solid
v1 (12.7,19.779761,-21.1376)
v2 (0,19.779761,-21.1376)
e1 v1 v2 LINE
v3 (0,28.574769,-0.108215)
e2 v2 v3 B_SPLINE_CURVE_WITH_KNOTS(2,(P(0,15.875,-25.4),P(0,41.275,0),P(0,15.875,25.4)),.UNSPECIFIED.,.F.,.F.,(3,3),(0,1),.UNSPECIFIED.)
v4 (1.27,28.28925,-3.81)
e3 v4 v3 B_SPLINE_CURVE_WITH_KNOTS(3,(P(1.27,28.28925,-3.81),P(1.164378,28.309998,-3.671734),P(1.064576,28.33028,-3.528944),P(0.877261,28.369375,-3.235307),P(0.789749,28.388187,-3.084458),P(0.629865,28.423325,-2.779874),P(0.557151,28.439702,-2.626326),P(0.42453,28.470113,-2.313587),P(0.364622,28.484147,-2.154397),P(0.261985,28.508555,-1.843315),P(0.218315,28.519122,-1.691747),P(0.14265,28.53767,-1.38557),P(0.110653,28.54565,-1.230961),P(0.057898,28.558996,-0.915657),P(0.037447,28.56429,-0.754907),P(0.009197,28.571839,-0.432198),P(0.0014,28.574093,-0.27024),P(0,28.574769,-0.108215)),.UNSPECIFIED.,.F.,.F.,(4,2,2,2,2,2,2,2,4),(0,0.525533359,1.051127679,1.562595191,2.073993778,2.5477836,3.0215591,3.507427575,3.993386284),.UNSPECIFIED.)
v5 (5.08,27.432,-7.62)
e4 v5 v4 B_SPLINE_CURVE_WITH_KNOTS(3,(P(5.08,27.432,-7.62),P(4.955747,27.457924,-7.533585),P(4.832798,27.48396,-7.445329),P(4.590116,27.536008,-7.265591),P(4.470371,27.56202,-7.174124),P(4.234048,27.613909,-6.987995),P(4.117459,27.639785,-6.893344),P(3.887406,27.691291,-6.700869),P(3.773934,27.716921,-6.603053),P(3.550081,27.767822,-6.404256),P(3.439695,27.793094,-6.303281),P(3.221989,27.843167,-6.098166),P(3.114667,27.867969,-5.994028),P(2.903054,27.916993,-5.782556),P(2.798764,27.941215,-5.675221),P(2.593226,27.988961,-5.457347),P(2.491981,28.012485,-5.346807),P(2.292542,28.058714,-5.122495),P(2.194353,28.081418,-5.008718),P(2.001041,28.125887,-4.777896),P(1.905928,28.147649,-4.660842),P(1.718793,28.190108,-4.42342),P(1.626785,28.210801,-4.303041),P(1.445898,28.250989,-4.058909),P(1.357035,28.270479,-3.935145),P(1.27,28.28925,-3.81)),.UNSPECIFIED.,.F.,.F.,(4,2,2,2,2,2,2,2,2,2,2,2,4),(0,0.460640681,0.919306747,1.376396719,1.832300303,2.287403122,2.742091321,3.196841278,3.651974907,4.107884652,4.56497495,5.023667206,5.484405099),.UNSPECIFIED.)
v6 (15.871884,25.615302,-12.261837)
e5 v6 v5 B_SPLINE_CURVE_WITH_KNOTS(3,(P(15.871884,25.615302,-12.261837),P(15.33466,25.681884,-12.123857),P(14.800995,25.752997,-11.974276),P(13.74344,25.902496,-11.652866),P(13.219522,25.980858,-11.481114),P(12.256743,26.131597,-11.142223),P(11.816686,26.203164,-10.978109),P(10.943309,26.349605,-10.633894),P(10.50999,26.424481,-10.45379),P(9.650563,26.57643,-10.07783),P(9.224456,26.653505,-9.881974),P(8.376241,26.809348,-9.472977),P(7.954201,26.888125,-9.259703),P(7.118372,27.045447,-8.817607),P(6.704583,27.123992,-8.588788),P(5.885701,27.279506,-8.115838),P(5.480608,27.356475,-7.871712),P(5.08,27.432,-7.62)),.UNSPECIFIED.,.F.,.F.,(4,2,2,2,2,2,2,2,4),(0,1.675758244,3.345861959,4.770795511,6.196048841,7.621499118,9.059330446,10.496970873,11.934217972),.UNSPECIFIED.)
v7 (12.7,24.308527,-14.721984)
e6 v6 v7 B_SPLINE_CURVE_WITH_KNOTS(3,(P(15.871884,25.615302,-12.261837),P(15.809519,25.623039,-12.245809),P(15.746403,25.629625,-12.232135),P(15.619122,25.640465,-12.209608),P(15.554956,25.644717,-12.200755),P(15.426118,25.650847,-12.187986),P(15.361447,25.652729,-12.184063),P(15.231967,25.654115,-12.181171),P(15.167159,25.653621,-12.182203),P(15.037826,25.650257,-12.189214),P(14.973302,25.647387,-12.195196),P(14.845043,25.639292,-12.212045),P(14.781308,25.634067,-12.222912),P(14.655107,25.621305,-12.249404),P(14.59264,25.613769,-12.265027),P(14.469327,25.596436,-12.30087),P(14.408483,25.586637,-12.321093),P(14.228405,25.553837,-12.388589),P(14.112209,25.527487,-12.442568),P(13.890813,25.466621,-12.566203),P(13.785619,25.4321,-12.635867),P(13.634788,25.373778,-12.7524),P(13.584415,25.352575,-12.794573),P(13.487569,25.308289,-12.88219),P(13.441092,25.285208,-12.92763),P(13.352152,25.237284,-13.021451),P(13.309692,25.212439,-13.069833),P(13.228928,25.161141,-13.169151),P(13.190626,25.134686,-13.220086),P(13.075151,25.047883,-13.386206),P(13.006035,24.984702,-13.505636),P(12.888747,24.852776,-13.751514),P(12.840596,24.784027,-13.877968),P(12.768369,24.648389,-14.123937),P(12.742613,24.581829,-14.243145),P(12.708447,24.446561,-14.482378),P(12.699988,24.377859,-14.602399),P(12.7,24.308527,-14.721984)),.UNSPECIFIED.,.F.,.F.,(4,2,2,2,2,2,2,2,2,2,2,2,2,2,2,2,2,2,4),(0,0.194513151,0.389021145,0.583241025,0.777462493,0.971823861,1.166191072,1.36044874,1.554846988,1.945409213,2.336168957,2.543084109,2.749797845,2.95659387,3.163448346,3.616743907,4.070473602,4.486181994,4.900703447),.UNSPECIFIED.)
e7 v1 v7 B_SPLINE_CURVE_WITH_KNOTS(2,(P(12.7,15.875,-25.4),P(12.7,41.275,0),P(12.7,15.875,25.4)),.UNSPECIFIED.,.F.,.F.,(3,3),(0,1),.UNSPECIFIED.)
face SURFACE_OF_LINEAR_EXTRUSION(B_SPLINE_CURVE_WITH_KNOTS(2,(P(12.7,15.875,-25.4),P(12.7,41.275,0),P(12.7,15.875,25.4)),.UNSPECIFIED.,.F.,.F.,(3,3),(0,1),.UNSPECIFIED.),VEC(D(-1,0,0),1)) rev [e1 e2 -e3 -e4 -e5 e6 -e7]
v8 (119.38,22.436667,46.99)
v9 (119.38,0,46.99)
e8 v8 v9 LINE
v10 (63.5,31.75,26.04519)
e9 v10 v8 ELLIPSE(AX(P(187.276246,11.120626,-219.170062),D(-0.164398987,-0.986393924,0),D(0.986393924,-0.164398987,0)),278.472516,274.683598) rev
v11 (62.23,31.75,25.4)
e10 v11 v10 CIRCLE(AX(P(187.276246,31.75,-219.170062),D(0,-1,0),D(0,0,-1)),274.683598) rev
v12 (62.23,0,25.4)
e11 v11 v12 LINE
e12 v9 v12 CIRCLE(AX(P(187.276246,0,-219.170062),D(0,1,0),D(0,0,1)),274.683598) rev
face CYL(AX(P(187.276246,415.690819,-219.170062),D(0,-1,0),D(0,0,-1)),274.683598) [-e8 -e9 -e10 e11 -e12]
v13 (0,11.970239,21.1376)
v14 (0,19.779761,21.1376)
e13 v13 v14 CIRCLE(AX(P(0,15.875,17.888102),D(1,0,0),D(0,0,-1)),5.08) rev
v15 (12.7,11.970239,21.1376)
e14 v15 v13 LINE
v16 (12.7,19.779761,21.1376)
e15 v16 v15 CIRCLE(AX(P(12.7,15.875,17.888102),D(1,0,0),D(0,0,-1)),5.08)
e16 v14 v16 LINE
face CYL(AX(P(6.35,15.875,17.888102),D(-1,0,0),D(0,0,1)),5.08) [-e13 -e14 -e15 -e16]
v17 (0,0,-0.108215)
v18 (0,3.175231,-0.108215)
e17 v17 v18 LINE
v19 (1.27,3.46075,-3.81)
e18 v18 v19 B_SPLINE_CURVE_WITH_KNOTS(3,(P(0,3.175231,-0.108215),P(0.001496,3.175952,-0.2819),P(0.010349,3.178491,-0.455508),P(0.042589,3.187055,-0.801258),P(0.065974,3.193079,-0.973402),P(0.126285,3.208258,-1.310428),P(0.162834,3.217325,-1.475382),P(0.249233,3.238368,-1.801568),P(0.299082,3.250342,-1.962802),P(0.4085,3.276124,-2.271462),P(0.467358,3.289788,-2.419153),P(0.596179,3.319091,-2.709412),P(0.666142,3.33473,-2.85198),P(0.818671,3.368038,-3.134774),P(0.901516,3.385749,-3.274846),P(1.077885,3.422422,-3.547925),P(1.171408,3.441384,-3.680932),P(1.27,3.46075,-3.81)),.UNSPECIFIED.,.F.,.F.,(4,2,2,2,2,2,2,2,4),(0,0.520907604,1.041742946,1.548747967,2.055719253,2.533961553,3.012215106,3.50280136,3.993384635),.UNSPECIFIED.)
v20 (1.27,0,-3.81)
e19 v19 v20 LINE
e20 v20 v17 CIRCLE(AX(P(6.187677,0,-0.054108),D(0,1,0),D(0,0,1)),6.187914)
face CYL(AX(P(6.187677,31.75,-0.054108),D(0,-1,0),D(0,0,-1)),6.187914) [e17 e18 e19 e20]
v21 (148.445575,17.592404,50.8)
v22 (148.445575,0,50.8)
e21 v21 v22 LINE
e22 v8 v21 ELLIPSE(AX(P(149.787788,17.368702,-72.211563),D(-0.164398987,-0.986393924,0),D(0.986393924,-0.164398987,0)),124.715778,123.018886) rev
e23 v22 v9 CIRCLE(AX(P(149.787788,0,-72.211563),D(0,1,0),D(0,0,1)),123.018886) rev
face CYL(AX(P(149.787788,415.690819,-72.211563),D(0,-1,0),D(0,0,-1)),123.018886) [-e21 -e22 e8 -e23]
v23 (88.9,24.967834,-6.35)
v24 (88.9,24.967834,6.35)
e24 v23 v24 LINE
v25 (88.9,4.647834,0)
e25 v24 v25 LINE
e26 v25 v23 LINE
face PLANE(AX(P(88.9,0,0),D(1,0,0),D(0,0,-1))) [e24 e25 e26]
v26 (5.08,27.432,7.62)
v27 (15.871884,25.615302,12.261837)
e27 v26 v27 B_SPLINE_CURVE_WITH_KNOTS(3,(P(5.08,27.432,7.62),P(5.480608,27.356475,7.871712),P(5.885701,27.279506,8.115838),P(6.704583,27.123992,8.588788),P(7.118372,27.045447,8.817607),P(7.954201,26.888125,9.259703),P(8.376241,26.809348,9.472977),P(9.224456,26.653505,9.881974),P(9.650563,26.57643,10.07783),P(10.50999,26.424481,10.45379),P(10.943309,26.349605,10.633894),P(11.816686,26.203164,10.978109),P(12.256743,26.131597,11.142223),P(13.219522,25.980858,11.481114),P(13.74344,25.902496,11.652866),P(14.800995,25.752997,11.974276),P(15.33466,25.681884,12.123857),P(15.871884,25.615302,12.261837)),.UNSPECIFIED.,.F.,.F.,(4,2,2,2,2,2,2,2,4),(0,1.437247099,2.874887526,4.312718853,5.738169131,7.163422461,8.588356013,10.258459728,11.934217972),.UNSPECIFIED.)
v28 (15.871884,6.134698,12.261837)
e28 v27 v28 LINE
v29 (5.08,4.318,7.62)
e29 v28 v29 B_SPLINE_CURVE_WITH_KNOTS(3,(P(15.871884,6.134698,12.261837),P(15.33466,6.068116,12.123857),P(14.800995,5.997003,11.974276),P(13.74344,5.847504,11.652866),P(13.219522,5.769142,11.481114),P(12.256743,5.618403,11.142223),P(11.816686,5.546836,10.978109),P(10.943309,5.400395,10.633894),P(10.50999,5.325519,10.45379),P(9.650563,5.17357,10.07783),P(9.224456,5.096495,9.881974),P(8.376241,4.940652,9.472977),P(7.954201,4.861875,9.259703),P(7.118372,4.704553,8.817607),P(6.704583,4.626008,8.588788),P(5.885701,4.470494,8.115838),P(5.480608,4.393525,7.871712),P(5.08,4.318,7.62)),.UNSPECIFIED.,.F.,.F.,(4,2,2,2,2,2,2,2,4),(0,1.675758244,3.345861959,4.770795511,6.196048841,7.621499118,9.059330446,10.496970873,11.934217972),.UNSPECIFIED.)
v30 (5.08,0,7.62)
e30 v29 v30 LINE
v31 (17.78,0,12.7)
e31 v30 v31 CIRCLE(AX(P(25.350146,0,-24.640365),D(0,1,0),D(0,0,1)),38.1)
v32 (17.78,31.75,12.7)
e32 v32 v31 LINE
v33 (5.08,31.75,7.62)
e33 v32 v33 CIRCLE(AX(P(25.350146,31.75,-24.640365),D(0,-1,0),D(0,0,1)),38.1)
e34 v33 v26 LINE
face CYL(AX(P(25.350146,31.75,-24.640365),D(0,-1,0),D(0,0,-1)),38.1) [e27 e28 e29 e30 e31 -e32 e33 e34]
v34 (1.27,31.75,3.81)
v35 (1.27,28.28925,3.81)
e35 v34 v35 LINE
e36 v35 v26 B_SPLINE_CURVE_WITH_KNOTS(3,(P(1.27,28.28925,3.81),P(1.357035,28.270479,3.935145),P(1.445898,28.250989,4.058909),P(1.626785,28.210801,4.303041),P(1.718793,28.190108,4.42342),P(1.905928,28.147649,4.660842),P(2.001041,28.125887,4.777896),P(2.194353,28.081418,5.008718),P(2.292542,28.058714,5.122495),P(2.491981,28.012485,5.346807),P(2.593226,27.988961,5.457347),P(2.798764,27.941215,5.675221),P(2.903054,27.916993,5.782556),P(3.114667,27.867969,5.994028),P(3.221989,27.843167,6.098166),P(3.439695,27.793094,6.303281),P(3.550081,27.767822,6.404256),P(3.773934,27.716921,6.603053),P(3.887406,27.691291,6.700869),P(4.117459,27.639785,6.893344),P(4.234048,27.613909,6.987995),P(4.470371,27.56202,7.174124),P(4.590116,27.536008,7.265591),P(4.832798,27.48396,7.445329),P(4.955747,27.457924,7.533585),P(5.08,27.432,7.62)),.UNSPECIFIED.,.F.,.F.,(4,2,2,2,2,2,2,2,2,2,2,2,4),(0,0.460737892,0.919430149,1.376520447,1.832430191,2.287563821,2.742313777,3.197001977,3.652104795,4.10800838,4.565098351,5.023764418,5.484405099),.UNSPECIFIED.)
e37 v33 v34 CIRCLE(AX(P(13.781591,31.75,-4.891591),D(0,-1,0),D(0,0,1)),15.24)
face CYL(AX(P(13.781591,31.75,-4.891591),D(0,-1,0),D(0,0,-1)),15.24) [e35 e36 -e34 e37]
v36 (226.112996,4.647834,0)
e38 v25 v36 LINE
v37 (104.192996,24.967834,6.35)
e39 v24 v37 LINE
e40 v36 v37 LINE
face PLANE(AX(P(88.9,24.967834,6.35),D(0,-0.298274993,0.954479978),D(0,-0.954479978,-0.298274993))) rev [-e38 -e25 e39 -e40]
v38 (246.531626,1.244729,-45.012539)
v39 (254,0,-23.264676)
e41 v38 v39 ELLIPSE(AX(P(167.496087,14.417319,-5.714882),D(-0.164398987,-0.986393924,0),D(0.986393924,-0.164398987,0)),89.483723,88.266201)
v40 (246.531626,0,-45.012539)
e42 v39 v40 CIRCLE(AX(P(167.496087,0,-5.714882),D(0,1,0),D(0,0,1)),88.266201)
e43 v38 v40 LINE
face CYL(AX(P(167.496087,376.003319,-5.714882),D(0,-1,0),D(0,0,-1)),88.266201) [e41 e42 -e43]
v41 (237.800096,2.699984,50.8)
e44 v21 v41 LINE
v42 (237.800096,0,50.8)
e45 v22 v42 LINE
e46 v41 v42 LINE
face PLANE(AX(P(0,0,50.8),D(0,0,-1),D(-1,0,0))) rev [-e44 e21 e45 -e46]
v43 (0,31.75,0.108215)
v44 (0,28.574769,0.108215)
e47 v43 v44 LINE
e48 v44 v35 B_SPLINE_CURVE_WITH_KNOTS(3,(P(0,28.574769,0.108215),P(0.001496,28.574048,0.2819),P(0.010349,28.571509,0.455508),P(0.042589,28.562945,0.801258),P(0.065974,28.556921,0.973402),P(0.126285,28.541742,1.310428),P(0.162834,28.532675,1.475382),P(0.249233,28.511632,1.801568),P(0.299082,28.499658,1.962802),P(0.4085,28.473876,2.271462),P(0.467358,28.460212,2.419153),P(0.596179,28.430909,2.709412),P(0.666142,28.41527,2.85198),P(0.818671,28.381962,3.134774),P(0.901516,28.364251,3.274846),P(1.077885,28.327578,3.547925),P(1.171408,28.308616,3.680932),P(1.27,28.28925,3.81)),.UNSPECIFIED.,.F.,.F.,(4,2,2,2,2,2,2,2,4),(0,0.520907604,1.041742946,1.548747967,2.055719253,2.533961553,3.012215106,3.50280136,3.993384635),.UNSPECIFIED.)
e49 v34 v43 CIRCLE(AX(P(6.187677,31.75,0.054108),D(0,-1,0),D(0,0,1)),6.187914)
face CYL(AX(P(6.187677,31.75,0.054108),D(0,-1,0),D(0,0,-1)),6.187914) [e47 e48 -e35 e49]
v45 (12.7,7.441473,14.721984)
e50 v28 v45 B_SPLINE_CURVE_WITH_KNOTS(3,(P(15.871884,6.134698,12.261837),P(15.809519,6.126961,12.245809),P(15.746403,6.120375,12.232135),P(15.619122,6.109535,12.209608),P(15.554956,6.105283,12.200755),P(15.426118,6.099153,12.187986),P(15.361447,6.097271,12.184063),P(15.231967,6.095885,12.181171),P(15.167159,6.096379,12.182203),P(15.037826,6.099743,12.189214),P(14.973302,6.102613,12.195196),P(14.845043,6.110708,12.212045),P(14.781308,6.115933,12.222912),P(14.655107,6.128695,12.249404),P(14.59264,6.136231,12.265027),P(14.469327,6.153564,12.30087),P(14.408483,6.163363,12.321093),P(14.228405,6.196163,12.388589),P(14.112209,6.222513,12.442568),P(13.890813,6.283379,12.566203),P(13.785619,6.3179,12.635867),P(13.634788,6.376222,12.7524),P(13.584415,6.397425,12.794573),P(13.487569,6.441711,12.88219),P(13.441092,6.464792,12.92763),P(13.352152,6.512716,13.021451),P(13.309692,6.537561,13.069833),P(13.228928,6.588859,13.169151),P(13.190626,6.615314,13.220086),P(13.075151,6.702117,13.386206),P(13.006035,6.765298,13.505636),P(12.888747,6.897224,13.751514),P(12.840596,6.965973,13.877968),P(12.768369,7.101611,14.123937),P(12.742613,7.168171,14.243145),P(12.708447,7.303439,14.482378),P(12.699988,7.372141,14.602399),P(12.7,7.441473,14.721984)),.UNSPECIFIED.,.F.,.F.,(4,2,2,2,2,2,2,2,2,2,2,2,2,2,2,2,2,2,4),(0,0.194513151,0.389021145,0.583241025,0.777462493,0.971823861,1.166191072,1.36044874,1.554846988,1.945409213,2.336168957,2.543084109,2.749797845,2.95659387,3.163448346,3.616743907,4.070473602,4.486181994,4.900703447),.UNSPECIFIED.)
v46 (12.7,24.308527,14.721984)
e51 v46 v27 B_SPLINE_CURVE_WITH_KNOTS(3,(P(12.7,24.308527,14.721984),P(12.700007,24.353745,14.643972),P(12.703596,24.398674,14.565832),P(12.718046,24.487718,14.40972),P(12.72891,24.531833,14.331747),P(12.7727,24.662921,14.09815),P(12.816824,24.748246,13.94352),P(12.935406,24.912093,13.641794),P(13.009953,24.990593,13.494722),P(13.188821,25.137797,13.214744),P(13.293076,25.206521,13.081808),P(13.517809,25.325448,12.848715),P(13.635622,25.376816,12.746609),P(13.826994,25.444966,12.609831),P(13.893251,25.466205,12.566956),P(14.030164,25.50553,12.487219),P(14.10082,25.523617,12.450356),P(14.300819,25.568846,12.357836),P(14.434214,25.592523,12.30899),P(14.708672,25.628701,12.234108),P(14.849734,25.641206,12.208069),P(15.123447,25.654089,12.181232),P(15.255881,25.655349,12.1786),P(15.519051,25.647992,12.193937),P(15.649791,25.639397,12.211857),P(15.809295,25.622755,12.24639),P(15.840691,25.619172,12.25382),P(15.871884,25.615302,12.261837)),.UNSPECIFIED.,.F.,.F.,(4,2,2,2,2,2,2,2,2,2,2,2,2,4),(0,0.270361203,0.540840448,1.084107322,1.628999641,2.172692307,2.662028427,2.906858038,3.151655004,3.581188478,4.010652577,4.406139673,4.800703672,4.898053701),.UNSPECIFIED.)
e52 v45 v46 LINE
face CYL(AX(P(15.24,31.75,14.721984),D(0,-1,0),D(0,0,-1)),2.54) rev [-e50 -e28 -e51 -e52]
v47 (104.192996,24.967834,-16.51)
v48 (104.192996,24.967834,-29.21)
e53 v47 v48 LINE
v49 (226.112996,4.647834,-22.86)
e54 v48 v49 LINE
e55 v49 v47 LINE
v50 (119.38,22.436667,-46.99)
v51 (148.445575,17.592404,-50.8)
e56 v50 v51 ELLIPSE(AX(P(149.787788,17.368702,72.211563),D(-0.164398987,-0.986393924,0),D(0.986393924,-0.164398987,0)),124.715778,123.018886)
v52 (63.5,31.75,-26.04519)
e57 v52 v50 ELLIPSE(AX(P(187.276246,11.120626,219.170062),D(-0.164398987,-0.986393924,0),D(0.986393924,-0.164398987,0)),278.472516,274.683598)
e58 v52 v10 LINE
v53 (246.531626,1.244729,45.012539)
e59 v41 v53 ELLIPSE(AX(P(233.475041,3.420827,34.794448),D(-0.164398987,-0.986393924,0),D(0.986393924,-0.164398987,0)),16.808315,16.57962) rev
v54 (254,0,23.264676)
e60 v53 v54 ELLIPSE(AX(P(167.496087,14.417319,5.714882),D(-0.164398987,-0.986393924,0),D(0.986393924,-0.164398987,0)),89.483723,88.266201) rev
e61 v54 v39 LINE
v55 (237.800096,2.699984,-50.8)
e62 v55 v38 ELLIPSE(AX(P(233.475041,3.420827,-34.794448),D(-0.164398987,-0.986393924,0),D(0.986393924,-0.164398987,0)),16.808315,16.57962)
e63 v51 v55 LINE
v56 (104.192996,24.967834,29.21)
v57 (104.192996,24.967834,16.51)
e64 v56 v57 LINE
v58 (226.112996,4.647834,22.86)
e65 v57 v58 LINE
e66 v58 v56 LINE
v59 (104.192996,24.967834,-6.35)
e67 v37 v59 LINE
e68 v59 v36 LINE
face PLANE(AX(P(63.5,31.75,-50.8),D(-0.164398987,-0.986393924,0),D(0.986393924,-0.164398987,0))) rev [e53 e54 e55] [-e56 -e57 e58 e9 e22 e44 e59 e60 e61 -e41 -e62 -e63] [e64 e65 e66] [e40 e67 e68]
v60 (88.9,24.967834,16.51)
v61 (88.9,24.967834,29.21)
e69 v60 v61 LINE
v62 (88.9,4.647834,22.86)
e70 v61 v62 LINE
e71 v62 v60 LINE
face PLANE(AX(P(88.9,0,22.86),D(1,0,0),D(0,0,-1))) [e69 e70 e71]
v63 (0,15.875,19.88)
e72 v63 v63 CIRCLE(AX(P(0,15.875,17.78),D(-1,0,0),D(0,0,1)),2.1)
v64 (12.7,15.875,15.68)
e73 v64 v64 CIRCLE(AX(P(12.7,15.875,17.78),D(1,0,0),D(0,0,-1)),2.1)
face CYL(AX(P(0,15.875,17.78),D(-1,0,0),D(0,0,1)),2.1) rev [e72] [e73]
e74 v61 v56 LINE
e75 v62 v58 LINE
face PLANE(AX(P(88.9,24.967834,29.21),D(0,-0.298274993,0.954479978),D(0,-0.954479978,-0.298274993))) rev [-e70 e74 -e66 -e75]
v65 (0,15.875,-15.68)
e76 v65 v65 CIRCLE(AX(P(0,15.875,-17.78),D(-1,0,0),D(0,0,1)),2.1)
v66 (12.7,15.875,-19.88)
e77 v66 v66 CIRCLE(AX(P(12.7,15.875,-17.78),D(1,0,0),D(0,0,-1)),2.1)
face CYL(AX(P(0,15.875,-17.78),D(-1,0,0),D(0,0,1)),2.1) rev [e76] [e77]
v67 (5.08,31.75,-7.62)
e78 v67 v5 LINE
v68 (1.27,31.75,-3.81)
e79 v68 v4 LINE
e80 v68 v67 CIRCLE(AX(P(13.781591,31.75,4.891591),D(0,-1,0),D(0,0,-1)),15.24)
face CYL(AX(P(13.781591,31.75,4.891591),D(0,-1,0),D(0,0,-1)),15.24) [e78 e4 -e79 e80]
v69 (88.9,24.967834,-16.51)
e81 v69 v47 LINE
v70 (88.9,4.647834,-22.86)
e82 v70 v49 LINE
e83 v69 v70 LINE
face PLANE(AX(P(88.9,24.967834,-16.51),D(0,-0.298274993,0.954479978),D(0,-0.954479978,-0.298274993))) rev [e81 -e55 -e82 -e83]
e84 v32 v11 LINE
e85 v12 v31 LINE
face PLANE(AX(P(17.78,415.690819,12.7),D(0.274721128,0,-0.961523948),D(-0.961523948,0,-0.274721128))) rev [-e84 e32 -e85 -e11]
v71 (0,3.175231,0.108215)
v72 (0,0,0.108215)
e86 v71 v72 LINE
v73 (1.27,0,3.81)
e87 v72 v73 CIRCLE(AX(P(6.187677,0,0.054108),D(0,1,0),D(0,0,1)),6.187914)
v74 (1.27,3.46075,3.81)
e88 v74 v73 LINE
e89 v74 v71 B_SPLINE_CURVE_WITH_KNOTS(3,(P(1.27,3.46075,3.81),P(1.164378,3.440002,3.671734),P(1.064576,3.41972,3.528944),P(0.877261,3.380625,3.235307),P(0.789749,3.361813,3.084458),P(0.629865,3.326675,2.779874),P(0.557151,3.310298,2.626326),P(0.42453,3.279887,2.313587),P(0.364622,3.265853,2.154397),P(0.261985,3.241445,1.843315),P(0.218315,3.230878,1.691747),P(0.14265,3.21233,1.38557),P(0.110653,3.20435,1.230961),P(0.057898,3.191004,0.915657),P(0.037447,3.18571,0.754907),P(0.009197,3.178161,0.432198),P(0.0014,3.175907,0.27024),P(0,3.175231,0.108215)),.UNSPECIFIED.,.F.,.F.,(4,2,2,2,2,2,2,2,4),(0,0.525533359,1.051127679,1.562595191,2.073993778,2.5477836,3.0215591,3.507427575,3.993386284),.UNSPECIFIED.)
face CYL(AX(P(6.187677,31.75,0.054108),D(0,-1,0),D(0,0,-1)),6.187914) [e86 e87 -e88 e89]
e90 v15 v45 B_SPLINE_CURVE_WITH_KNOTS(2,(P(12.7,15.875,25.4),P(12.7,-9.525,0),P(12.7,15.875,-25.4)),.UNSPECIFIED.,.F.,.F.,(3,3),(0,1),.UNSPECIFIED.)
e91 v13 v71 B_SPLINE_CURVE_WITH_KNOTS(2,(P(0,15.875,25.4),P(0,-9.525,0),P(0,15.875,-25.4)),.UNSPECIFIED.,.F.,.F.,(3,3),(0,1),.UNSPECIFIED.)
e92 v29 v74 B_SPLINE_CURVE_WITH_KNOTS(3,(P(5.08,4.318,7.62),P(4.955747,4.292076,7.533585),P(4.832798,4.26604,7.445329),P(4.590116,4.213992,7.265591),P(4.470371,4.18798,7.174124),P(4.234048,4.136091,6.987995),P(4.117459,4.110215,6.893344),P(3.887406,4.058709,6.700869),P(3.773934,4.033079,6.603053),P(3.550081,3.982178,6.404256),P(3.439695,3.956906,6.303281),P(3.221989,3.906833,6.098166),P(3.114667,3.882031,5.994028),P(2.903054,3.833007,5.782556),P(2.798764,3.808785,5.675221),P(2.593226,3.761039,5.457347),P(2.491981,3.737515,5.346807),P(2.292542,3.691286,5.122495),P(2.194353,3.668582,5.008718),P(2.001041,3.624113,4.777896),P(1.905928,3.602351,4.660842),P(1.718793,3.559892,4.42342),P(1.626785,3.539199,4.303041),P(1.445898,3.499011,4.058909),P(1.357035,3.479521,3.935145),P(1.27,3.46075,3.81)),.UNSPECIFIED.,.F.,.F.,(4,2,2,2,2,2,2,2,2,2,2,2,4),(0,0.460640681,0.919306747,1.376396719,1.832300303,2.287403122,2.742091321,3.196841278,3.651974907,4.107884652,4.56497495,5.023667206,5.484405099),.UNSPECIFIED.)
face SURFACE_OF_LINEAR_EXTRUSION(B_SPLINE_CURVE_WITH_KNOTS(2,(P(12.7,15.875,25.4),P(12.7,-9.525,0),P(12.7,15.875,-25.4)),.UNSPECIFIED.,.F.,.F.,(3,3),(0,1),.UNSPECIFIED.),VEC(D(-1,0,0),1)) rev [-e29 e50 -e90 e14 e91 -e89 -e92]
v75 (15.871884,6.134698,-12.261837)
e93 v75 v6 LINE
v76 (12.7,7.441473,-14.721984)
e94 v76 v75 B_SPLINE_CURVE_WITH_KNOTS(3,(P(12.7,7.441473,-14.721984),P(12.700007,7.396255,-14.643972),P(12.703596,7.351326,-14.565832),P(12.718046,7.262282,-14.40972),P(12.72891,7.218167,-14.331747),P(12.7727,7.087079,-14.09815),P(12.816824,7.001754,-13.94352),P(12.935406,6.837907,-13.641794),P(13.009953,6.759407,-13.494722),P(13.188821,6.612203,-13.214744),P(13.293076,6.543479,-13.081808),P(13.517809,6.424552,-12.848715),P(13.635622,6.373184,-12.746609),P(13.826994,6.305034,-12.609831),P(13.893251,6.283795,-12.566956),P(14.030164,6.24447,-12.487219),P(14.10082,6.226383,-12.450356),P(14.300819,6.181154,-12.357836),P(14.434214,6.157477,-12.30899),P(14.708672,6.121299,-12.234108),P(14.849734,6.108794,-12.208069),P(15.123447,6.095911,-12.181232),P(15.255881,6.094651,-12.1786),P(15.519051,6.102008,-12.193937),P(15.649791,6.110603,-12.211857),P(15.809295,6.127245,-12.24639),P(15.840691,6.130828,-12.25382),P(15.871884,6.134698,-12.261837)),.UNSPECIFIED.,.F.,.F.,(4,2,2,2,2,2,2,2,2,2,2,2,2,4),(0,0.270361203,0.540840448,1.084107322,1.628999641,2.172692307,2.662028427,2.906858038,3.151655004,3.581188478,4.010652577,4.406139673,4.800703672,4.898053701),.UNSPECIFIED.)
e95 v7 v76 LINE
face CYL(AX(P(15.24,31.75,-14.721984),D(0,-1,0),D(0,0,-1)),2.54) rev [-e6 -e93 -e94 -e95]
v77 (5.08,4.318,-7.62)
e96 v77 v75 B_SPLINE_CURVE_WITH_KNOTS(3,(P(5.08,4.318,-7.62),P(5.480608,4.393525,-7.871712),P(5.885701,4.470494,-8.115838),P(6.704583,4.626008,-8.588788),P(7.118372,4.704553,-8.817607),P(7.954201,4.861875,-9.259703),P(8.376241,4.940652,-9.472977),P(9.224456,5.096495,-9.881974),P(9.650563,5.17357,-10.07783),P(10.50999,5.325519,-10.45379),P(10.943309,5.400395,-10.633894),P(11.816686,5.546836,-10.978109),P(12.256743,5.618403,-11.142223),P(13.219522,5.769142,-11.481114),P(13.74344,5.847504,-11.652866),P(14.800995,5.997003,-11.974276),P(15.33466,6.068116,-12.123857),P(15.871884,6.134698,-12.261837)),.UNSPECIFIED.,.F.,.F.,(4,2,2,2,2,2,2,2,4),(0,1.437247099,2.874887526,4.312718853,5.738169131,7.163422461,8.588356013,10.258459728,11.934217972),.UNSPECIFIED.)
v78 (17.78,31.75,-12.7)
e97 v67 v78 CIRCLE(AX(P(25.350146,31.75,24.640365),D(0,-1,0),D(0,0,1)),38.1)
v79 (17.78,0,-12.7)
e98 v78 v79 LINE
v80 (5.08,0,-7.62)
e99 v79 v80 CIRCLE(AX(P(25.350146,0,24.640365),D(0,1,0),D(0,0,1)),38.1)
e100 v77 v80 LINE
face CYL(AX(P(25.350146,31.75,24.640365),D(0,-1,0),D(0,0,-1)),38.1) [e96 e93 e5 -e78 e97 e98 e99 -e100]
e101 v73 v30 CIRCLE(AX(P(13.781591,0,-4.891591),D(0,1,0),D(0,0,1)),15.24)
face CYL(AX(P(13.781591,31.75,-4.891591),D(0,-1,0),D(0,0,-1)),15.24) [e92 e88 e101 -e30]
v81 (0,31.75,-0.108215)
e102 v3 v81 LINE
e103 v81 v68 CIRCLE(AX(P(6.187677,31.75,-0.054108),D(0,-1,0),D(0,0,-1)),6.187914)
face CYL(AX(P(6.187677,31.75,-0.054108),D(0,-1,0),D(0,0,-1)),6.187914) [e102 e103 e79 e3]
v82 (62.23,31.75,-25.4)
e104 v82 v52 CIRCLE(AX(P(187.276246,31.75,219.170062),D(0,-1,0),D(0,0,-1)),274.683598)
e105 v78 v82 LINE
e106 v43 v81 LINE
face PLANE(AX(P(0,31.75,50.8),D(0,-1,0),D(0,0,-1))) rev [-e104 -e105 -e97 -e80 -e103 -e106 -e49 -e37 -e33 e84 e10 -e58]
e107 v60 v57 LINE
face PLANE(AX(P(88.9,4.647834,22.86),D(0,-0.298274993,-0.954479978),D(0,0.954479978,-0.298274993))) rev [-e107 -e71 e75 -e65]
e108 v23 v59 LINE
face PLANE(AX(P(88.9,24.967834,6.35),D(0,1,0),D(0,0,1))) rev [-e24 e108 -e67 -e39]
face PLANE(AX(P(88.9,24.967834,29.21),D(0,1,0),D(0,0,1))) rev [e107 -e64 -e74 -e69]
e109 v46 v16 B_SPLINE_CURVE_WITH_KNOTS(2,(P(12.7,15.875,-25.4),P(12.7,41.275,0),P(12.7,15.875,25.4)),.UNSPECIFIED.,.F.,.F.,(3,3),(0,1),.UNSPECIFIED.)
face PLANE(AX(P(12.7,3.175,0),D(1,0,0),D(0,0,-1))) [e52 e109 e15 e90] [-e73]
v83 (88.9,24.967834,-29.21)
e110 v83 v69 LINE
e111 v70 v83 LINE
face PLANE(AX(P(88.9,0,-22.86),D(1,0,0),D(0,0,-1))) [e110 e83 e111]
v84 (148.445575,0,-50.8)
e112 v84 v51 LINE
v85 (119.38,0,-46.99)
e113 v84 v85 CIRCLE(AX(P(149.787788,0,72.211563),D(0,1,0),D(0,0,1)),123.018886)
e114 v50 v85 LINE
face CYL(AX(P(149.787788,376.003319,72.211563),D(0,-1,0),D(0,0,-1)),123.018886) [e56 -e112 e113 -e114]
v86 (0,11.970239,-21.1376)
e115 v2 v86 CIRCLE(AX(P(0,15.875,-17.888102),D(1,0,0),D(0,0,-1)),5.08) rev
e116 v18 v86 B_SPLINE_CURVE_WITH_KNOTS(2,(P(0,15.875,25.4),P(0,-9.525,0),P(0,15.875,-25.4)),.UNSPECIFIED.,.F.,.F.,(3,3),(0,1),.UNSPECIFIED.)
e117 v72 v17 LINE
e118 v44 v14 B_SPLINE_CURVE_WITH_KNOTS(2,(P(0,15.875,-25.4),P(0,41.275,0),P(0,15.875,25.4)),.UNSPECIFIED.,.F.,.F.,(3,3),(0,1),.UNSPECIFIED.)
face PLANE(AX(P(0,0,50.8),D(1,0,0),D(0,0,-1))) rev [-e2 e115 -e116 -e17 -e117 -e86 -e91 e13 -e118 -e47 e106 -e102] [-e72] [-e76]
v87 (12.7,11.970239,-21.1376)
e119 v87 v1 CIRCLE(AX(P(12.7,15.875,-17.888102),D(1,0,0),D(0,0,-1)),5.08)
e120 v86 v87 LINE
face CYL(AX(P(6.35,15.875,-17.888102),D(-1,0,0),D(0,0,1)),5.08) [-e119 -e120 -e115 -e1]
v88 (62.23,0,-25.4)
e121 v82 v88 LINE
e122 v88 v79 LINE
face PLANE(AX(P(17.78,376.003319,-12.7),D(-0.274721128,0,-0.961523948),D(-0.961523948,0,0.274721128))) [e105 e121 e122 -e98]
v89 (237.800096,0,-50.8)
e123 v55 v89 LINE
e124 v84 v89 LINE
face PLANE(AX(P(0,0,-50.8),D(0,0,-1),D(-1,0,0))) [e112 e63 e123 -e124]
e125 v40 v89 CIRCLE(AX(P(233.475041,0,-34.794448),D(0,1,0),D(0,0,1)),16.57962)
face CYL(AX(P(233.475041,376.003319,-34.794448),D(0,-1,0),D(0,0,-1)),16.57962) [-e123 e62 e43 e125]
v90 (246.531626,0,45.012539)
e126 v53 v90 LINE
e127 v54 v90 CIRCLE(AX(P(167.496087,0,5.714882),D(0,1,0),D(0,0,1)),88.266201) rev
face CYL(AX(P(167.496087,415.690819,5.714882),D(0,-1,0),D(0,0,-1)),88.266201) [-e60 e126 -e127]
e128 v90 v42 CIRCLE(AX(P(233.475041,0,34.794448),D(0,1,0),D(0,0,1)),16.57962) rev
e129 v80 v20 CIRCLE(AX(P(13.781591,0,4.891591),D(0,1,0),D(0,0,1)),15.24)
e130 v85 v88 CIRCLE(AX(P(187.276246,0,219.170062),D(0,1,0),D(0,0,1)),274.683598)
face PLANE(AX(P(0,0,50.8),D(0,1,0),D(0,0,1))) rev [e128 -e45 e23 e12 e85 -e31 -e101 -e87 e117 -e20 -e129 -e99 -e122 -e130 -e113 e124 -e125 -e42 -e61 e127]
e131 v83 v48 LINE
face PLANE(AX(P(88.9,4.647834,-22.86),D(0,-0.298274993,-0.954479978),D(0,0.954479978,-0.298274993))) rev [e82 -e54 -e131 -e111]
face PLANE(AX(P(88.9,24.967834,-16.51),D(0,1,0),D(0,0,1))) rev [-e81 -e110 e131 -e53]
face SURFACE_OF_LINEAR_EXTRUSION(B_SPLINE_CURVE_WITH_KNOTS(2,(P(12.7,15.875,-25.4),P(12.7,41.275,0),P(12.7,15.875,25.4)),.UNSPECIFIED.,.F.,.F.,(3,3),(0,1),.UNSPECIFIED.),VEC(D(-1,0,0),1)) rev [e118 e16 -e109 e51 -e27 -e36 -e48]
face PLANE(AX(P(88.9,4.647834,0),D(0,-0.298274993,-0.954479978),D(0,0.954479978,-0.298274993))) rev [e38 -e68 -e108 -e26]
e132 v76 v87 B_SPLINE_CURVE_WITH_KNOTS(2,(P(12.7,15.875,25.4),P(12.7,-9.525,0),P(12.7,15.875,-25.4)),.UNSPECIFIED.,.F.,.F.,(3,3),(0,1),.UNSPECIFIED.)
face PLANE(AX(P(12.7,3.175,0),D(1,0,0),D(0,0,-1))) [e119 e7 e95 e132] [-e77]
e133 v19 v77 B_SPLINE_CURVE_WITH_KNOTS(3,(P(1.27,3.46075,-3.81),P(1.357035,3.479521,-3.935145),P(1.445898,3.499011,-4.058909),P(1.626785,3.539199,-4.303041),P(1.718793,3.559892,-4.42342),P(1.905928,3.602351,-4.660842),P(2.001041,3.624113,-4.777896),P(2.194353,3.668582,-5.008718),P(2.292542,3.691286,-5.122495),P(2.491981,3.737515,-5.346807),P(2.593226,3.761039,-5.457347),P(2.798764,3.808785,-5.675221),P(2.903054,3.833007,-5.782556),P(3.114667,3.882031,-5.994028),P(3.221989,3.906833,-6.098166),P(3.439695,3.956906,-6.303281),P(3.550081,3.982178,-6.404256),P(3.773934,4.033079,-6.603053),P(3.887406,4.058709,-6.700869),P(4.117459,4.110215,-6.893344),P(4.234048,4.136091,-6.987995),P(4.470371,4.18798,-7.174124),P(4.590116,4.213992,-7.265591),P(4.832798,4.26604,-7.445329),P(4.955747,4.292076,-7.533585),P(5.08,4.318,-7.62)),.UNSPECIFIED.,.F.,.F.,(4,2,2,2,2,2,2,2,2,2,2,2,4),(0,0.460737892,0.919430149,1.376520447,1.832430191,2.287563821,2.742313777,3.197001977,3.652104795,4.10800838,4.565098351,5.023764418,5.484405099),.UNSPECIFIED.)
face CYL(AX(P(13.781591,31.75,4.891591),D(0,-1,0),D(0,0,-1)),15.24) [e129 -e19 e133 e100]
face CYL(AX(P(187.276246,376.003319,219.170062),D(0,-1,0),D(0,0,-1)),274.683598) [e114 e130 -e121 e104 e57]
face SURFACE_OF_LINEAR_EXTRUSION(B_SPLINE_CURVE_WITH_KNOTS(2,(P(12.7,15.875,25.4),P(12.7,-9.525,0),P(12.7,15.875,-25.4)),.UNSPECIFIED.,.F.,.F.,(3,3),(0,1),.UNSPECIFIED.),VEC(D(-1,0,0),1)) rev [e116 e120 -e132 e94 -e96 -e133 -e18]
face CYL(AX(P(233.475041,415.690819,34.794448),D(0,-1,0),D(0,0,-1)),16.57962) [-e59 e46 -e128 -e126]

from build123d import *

# Parameters (mm, degrees)
SKETCH1_W               = 254
SKETCH1_H               = 31.75
BOSS_EXTRUDE1_DEPTH     = 50.8
CUT_EXTRUDE1_DEPTH      = 261.968776868
CUT_EXTRUDE1_DEPTH_BACK = 261.968776868
CUT_EXTRUDE2_DEPTH      = 261.968776868
CUT_EXTRUDE2_DEPTH_BACK = 101.6
CUT_EXTRUDE3_START      = -31.75
CUT_EXTRUDE3_DEPTH      = 31.75
CUT_EXTRUDE4_DEPTH      = 203.2
LPATTERN1_COUNT         = 2
LPATTERN1_PITCH         = 22.86
LPATTERN1_COL_COUNT     = 2
LPATTERN1_COL_PITCH     = 22.86
BOSS_EXTRUDE2_DEPTH     = 12.7
M5_TAPPED_HOLE1_D       = 4.2
M5_TAPPED_HOLE1_DEPTH   = 13.97
M5_TAPPED_HOLE1_TIP     = 1.2618073
FILLET1_R               = 2.54
FILLET2_R               = 5.08


# Read off the part's stored shape, not the designer's step: Cut-Extrude3
with BuildPart() as part:
    # Sketch1 → Boss-Extrude1 (new, symmetric)
    with BuildSketch(Plane.XY):
        with Locations((127, 15.875)):
            Rectangle(SKETCH1_W, SKETCH1_H)
    extrude(amount=BOSS_EXTRUDE1_DEPTH, both=True)

    # Sketch2 → Cut-Extrude1 (cut, two sides: drawn at the far end of the back side and taken through both)
    with BuildSketch(Plane.XY.offset(-CUT_EXTRUDE1_DEPTH_BACK)):
        Polygon((63.5, 31.75), (254, 0), (254, 31.75), align=None)
    extrude(amount=CUT_EXTRUDE1_DEPTH + CUT_EXTRUDE1_DEPTH_BACK, mode=Mode.SUBTRACT)

    # Sketch3 → Cut-Extrude2 (cut, two sides: drawn at the far end of the back side and taken through both)
    with BuildSketch(Plane(origin=(0, 0, 0), x_dir=(1, 0, 0), z_dir=(0, 1, 0)).offset(-CUT_EXTRUDE2_DEPTH_BACK)):
        with BuildLine():
            Line((17.78, 12.7), (17.78, 72.102848299))
            Line((17.78, 72.102848299), (-32.844059738, 72.102848299))
            Line((-32.844059738, 72.102848299), (-31.340021966, -58.533575325))
            Line((-31.340021966, -58.533575325), (17.78, -58.533575325))
            Line((17.78, -58.533575325), (17.78, -12.7))
            ThreePointArc((17.78, -12.7), (11.200161386, -10.734596536), (5.08, -7.62))
            ThreePointArc((5.08, -7.62), (3.005283766, -5.884716234), (1.27, -3.81))
            ThreePointArc((1.27, -3.81), (0.317306771, -2.010897743), (0, 0))
            ThreePointArc((0, 0), (0.317306771, 2.010897743), (1.27, 3.81))
            ThreePointArc((1.27, 3.81), (3.005283766, 5.884716234), (5.08, 7.62))
            ThreePointArc((5.08, 7.62), (11.200161386, 10.734596536), (17.78, 12.7))
        make_face()
    extrude(amount=CUT_EXTRUDE2_DEPTH + CUT_EXTRUDE2_DEPTH_BACK, mode=Mode.SUBTRACT)

    # Cut-Extrude3 outline → Cut-Extrude3 (cut)
    with BuildSketch(Plane(origin=(0, 31.75, 0), x_dir=(1, 0, 0), z_dir=(0, 1, 0)).offset(CUT_EXTRUDE3_START)):
        with BuildLine():
            Line((17.78, 12.7), (62.23, 25.4))
            ThreePointArc((62.23, 25.4), (90.202906045, 37.788778117), (119.38, 46.99))
            ThreePointArc((119.38, 46.99), (133.798896157, 49.763850575), (148.445575226, 50.8))
            Line((148.445575226, 50.8), (17.78, 50.8))
            Line((17.78, 50.8), (17.78, 12.7))
        make_face()
        with BuildLine():
            Line((255, 50.8), (237.800096312, 50.8))
            ThreePointArc((237.800096312, 50.8), (242.634955157, 48.613990909), (246.531625641, 45.012539127))
            ThreePointArc((246.531625641, 45.012539127), (250.977042308, 34.38284899), (254, 23.264676093))
            Line((254, 23.264676093), (255, 18.335620452))
            Line((255, 18.335620452), (255, 50.8))
        make_face()
    cut_extrude3 = extrude(amount=CUT_EXTRUDE3_DEPTH, mode=Mode.SUBTRACT)

    # Mirror2: Cut-Extrude3 across plane
    add(cut_extrude3.mirror(Plane.XY), mode=Mode.SUBTRACT)

    # Sketch7 → Cut-Extrude4 (cut)
    with BuildSketch(Plane(origin=(292.1, 0, 0), x_dir=(0, 0, -1), z_dir=(1, 0, 0))):
        Polygon((-6.35, 24.967833991), (6.35, 24.967833991), (0, 4.647833991), align=None)
    cut_extrude4 = extrude(amount=-CUT_EXTRUDE4_DEPTH, mode=Mode.SUBTRACT)

    # LPattern1: Cut-Extrude4 ×2
    with Locations(*[(0, 0, i * LPATTERN1_PITCH) for i in range(1, LPATTERN1_COUNT)]):
        add(cut_extrude4, mode=Mode.SUBTRACT)

    # LPattern1 col: Cut-Extrude4 ×2
    with Locations(*[(0, 0, -i * LPATTERN1_COL_PITCH) for i in range(1, LPATTERN1_COL_COUNT)]):
        add(cut_extrude4, mode=Mode.SUBTRACT)

    # Sketch9 → Boss-Extrude2 (add)
    with BuildSketch(Plane(origin=(0, 0, 0), x_dir=(0, 0, -1), z_dir=(1, 0, 0))):
        with BuildLine():
            add(Edge.make_bspline(
                [(-25.4, 15.875), (0, 41.275), (25.4, 15.875)],
                knots=[0, 0, 0, 1, 1, 1], degree=2))
            add(Edge.make_bspline(
                [(25.4, 15.875), (0, -9.525), (-25.4, 15.875)],
                knots=[0, 0, 0, 1, 1, 1], degree=2))
        make_face()
    extrude(amount=BOSS_EXTRUDE2_DEPTH)

    # M5 Tapped Hole1
    with Locations(Plane.ZY):
        with Locations((17.78, 15.875), (-17.78, 15.875)):
            Hole(M5_TAPPED_HOLE1_D / 2, depth=M5_TAPPED_HOLE1_DEPTH)
            with Locations((0, 0, -(M5_TAPPED_HOLE1_DEPTH + M5_TAPPED_HOLE1_TIP / 2))):  # 118° drill point
                Cone(0, M5_TAPPED_HOLE1_D / 2, M5_TAPPED_HOLE1_TIP, mode=Mode.SUBTRACT)

    # Fillet1
    fillet1_edges = [part.edges().sort_by_distance(p)[0] for p in [
        (12.7, 15.875, 11.298246193),
        (12.7, 15.875, -11.298246193),
    ]]
    fillet(fillet1_edges, radius=FILLET1_R)

    # Fillet2
    fillet2_edges = [part.edges().sort_by_distance(p)[0] for p in [
        (6.35, 15.875, -25.4),
        (6.35, 15.875, 25.4),
    ]]
    fillet(fillet2_edges, radius=FILLET2_R)


solid = part.part
